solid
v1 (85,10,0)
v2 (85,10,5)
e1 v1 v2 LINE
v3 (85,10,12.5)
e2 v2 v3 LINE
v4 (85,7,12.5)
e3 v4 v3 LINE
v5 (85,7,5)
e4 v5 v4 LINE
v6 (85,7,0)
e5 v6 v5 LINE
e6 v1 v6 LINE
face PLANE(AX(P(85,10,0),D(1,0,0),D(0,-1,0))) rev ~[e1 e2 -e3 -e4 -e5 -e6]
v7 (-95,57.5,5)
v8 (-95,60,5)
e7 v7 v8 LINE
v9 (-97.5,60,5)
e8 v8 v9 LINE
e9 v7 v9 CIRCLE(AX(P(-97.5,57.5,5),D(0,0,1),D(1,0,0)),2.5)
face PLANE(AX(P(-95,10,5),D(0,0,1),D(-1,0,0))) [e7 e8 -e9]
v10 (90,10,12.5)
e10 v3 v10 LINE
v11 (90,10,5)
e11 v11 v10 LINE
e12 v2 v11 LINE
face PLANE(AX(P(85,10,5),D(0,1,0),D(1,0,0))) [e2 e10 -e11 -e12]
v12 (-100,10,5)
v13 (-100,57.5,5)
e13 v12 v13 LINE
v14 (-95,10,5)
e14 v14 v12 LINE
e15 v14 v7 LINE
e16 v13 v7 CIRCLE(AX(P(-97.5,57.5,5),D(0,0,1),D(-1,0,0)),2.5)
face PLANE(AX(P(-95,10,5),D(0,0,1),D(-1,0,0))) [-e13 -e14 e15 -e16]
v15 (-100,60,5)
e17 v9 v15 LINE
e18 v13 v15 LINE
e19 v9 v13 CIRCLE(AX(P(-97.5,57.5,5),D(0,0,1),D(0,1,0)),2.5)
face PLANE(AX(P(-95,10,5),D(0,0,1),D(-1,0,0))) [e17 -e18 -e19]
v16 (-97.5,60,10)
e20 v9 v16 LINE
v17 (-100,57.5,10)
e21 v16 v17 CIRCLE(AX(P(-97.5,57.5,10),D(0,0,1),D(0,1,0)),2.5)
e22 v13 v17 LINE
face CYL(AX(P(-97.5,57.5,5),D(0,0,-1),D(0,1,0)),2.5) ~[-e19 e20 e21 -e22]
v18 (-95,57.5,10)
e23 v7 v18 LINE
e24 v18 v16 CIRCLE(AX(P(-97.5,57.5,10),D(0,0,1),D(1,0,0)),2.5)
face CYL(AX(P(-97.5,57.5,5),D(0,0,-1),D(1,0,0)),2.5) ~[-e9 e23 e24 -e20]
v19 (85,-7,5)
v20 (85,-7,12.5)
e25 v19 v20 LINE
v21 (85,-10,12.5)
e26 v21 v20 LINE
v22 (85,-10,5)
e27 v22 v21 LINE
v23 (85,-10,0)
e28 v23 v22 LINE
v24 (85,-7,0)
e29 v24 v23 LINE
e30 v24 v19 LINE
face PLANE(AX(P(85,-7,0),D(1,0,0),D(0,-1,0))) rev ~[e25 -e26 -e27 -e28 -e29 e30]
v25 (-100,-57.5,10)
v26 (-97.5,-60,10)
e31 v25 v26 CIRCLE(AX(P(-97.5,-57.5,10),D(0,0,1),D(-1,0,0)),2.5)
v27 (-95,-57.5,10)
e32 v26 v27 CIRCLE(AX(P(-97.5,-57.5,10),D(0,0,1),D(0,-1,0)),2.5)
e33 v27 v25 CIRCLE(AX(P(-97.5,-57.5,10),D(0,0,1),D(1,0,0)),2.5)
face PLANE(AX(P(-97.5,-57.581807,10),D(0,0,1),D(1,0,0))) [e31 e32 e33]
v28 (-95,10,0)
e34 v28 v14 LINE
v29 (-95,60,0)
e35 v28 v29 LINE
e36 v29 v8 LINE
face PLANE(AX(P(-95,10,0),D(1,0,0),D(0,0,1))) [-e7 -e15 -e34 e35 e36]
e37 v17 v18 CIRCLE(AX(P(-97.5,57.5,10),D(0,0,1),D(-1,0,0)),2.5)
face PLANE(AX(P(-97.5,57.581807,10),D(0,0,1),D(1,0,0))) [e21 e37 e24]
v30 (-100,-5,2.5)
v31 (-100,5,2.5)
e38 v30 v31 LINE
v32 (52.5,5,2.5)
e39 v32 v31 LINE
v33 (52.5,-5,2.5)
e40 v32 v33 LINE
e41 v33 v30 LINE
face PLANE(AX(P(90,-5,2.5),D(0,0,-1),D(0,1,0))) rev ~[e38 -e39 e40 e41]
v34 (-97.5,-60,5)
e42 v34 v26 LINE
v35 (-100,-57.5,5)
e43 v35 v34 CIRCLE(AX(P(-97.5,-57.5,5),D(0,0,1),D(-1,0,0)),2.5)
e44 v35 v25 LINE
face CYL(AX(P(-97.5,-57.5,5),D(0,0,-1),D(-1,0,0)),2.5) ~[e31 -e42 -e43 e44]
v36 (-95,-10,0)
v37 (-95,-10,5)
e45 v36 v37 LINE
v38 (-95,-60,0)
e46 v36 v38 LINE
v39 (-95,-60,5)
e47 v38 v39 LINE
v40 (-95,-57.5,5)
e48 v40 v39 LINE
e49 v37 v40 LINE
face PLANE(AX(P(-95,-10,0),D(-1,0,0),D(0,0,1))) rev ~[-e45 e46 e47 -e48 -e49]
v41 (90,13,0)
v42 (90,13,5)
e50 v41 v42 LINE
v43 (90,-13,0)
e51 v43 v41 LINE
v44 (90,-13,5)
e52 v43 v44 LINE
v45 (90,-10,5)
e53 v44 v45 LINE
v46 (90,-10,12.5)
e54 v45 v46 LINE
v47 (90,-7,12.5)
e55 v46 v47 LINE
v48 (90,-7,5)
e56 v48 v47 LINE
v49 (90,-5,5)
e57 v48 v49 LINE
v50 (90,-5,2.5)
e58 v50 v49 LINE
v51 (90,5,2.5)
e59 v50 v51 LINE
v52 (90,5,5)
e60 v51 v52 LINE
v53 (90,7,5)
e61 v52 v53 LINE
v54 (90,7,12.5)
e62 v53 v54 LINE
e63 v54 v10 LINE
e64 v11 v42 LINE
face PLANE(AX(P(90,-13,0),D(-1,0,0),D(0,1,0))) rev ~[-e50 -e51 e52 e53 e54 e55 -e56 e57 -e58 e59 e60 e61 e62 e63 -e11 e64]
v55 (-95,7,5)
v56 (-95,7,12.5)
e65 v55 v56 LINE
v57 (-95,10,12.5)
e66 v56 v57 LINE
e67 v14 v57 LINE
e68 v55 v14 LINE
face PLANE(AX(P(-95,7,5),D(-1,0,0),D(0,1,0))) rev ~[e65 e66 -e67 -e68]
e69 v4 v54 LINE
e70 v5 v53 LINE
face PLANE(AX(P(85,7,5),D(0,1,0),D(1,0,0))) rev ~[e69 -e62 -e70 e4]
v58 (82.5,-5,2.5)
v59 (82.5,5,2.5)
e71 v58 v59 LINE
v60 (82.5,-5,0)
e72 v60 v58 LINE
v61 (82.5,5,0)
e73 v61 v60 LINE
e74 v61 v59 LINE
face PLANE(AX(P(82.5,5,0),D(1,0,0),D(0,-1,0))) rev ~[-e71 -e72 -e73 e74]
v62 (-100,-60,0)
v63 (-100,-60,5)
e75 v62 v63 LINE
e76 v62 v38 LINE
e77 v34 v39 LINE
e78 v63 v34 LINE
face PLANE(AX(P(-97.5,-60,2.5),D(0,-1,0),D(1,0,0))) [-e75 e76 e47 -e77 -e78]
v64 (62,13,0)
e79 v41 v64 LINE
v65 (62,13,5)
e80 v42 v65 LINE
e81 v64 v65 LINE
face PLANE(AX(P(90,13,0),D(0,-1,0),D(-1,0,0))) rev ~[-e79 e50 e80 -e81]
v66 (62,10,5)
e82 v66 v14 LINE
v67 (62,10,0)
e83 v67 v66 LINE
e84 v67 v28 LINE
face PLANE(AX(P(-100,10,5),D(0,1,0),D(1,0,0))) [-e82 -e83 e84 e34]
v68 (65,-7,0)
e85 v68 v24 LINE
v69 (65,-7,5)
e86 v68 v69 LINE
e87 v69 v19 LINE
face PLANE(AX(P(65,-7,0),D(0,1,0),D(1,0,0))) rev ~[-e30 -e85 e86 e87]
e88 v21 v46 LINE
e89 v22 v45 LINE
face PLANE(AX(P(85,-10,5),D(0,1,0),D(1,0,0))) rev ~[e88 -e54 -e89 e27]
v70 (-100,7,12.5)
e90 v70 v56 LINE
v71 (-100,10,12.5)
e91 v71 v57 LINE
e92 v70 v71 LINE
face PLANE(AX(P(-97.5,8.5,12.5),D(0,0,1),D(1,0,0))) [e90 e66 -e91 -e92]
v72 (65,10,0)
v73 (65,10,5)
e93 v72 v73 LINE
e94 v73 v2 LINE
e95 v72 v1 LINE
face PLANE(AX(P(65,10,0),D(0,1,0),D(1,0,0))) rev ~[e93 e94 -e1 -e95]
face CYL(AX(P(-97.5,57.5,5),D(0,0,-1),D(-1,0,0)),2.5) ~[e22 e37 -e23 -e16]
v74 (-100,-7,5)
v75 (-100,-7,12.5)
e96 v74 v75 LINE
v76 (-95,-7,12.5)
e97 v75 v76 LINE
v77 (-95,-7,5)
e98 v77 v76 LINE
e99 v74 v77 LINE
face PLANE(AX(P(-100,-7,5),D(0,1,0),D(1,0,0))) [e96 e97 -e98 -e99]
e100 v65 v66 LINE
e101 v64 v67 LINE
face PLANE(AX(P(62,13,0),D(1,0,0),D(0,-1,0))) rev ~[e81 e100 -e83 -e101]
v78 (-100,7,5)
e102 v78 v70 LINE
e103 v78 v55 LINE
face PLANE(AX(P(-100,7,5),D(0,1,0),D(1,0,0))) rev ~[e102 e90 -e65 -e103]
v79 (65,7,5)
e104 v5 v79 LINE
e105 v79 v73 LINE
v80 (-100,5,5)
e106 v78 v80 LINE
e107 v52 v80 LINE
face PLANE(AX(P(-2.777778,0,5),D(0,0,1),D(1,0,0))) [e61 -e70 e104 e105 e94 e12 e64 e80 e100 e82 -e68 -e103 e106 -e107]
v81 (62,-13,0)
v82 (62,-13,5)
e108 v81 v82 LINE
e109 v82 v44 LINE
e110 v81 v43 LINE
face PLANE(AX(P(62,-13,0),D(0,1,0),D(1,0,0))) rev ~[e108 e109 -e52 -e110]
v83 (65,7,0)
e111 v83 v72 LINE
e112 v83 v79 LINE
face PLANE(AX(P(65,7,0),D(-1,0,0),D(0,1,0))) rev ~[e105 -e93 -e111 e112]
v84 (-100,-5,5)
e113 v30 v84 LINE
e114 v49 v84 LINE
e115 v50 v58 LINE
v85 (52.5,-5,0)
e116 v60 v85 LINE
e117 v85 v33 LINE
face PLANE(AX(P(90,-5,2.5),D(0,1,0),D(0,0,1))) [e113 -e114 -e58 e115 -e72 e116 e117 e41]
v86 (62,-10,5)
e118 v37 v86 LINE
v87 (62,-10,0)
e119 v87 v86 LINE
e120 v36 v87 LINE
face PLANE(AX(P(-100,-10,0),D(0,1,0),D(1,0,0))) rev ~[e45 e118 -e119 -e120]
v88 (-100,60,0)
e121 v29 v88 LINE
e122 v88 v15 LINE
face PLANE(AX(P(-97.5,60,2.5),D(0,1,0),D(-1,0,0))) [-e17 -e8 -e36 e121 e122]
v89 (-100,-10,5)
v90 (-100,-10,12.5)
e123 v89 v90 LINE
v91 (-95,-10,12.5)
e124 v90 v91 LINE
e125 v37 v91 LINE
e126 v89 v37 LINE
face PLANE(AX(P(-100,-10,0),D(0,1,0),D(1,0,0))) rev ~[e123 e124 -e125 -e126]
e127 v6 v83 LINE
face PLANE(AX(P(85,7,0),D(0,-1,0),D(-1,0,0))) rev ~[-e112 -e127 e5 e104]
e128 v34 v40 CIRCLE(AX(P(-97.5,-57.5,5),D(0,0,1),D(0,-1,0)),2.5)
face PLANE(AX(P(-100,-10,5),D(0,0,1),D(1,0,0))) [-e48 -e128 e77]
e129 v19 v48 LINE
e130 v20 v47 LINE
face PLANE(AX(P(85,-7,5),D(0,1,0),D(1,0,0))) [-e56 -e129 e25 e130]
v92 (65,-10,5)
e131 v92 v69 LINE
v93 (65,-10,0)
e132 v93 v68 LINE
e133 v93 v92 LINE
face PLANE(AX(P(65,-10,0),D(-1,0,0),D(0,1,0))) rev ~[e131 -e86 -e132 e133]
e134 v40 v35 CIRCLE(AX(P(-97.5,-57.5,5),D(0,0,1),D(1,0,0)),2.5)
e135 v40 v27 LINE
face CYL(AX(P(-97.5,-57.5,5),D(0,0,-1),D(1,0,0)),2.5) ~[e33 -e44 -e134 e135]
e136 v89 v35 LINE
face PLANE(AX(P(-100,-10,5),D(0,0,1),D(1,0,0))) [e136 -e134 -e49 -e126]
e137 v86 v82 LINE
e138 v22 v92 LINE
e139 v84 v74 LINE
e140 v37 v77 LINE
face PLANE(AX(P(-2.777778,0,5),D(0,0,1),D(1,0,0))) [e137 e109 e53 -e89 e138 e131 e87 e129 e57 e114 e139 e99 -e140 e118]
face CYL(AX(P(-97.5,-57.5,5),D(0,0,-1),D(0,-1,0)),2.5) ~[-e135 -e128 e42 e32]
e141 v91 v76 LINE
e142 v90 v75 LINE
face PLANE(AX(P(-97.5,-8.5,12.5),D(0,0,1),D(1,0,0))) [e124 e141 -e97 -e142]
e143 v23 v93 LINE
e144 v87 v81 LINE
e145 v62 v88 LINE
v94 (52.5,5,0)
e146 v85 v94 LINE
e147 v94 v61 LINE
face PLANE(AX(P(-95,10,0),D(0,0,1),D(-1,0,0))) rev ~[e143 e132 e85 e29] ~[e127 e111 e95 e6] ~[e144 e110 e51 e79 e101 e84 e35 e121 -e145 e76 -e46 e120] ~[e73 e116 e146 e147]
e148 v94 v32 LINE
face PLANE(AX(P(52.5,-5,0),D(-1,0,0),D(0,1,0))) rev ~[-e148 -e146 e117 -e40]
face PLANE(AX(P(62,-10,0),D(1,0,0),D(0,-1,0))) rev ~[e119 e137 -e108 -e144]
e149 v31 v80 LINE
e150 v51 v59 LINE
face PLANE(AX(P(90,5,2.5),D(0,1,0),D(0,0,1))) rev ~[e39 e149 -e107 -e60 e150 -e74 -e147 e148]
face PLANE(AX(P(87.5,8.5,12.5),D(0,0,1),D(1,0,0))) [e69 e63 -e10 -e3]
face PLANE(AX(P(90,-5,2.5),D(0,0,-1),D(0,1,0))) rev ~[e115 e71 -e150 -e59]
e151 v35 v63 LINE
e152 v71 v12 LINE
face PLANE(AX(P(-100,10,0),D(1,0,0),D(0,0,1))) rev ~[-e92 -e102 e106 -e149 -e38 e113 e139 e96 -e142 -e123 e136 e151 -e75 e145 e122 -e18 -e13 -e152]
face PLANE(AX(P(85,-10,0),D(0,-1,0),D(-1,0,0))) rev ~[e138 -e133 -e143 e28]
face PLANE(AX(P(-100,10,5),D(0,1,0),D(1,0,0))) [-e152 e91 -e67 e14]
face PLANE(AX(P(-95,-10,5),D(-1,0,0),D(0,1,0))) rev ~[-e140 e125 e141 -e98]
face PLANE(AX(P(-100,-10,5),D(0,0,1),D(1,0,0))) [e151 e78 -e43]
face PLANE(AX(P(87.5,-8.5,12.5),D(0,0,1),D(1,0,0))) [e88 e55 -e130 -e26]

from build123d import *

# Parameters (mm, degrees)
F1_DEPTH  = 5
F2_W      = 10
F2_H      = 2.5
F3_DEPTH  = 200
F4_W      = 5
F4_H      = 3
F5_DEPTH  = 7.5
F6_W      = 5
F6_H      = 5
F7_DEPTH  = 50
F8_W      = 5
F8_H      = 5
F9_DEPTH  = 50
F12_DEPTH = 5


# Not quite as in the source:
# - a feature names something its author has since deleted; it is built from what else it names


with BuildPart() as f1:
    # F0 (on Top) → F1 (new body)
    with BuildSketch(Plane.XY):
        Polygon((-100, 10), (-100, 0), (-100, -10), (62, -10), (65, -10), (65, -7), (85, -7), (85, -10), (90, -10), (90, 0), (90, 10), (85, 10), (85, 7), (65, 7), (65, 10), (62, 10), align=None)
        Polygon((82.5, 5), (82.5, 0), (82.5, -5), (52.5, -5), (52.5, 0), (52.5, 5), align=None, mode=Mode.SUBTRACT)
        Polygon((65, -10), (62, -10), (62, -13), (90, -13), (90, -10), (85, -10), align=None)
        Polygon((62, 13), (62, 10), (65, 10), (85, 10), (90, 10), (90, 13), align=None)
    extrude(amount=F1_DEPTH)

    # F2 (on face) → F3 (cut)
    with BuildSketch(Plane.YZ.offset(90)):
        with Locations((0, 3.75)):
            Rectangle(F2_W, F2_H)
    extrude(amount=-F3_DEPTH, mode=Mode.SUBTRACT)

    # F4 (on face) → F5 (join)
    with BuildSketch(Plane.XY.offset(5)):
        with Locations((-97.5, 8.5)):
            Rectangle(F4_W, F4_H)
        with Locations((-97.5, -8.5)):
            Rectangle(F4_W, F4_H)
        with Locations((87.5, -8.5)):
            Rectangle(F4_W, F4_H)
        with Locations((87.5, 8.5)):
            Rectangle(F4_W, F4_H)
    extrude(amount=F5_DEPTH)

    # F6 (on face) → F7 (join)
    with BuildSketch(Plane.XZ.offset(10)):
        with Locations((-97.5, 2.5)):
            Rectangle(F6_W, F6_H)
    extrude(amount=F7_DEPTH)

    # F8 (on face) → F9 (join)
    with BuildSketch(Plane(origin=(0, 10, 0), x_dir=(-1, 0, 0), z_dir=(0, 1, 0))):
        with Locations((97.5, 2.5)):
            Rectangle(F8_W, F8_H)
    extrude(amount=F9_DEPTH)

    # F10 (on face) + F11 (on face) → F12 (join)
    with BuildSketch(Plane.XY.offset(5)):
        with BuildLine():
            ThreePointArc((-100, -57.5), (-99.267766953, -59.267766953), (-97.5, -60))
            ThreePointArc((-97.5, -60), (-95.732233047, -59.267766953), (-95, -57.5))
            ThreePointArc((-95, -57.5), (-97.5, -55), (-100, -57.5))
        make_face()
    with BuildSketch(Plane.XY.offset(5)):
        with BuildLine():
            ThreePointArc((-100, 57.5), (-97.5, 55), (-95, 57.5))
            ThreePointArc((-95, 57.5), (-95.732233047, 59.267766953), (-97.5, 60))
            ThreePointArc((-97.5, 60), (-99.267766953, 59.267766953), (-100, 57.5))
        make_face()
    extrude(amount=F12_DEPTH)


solid = f1.part
